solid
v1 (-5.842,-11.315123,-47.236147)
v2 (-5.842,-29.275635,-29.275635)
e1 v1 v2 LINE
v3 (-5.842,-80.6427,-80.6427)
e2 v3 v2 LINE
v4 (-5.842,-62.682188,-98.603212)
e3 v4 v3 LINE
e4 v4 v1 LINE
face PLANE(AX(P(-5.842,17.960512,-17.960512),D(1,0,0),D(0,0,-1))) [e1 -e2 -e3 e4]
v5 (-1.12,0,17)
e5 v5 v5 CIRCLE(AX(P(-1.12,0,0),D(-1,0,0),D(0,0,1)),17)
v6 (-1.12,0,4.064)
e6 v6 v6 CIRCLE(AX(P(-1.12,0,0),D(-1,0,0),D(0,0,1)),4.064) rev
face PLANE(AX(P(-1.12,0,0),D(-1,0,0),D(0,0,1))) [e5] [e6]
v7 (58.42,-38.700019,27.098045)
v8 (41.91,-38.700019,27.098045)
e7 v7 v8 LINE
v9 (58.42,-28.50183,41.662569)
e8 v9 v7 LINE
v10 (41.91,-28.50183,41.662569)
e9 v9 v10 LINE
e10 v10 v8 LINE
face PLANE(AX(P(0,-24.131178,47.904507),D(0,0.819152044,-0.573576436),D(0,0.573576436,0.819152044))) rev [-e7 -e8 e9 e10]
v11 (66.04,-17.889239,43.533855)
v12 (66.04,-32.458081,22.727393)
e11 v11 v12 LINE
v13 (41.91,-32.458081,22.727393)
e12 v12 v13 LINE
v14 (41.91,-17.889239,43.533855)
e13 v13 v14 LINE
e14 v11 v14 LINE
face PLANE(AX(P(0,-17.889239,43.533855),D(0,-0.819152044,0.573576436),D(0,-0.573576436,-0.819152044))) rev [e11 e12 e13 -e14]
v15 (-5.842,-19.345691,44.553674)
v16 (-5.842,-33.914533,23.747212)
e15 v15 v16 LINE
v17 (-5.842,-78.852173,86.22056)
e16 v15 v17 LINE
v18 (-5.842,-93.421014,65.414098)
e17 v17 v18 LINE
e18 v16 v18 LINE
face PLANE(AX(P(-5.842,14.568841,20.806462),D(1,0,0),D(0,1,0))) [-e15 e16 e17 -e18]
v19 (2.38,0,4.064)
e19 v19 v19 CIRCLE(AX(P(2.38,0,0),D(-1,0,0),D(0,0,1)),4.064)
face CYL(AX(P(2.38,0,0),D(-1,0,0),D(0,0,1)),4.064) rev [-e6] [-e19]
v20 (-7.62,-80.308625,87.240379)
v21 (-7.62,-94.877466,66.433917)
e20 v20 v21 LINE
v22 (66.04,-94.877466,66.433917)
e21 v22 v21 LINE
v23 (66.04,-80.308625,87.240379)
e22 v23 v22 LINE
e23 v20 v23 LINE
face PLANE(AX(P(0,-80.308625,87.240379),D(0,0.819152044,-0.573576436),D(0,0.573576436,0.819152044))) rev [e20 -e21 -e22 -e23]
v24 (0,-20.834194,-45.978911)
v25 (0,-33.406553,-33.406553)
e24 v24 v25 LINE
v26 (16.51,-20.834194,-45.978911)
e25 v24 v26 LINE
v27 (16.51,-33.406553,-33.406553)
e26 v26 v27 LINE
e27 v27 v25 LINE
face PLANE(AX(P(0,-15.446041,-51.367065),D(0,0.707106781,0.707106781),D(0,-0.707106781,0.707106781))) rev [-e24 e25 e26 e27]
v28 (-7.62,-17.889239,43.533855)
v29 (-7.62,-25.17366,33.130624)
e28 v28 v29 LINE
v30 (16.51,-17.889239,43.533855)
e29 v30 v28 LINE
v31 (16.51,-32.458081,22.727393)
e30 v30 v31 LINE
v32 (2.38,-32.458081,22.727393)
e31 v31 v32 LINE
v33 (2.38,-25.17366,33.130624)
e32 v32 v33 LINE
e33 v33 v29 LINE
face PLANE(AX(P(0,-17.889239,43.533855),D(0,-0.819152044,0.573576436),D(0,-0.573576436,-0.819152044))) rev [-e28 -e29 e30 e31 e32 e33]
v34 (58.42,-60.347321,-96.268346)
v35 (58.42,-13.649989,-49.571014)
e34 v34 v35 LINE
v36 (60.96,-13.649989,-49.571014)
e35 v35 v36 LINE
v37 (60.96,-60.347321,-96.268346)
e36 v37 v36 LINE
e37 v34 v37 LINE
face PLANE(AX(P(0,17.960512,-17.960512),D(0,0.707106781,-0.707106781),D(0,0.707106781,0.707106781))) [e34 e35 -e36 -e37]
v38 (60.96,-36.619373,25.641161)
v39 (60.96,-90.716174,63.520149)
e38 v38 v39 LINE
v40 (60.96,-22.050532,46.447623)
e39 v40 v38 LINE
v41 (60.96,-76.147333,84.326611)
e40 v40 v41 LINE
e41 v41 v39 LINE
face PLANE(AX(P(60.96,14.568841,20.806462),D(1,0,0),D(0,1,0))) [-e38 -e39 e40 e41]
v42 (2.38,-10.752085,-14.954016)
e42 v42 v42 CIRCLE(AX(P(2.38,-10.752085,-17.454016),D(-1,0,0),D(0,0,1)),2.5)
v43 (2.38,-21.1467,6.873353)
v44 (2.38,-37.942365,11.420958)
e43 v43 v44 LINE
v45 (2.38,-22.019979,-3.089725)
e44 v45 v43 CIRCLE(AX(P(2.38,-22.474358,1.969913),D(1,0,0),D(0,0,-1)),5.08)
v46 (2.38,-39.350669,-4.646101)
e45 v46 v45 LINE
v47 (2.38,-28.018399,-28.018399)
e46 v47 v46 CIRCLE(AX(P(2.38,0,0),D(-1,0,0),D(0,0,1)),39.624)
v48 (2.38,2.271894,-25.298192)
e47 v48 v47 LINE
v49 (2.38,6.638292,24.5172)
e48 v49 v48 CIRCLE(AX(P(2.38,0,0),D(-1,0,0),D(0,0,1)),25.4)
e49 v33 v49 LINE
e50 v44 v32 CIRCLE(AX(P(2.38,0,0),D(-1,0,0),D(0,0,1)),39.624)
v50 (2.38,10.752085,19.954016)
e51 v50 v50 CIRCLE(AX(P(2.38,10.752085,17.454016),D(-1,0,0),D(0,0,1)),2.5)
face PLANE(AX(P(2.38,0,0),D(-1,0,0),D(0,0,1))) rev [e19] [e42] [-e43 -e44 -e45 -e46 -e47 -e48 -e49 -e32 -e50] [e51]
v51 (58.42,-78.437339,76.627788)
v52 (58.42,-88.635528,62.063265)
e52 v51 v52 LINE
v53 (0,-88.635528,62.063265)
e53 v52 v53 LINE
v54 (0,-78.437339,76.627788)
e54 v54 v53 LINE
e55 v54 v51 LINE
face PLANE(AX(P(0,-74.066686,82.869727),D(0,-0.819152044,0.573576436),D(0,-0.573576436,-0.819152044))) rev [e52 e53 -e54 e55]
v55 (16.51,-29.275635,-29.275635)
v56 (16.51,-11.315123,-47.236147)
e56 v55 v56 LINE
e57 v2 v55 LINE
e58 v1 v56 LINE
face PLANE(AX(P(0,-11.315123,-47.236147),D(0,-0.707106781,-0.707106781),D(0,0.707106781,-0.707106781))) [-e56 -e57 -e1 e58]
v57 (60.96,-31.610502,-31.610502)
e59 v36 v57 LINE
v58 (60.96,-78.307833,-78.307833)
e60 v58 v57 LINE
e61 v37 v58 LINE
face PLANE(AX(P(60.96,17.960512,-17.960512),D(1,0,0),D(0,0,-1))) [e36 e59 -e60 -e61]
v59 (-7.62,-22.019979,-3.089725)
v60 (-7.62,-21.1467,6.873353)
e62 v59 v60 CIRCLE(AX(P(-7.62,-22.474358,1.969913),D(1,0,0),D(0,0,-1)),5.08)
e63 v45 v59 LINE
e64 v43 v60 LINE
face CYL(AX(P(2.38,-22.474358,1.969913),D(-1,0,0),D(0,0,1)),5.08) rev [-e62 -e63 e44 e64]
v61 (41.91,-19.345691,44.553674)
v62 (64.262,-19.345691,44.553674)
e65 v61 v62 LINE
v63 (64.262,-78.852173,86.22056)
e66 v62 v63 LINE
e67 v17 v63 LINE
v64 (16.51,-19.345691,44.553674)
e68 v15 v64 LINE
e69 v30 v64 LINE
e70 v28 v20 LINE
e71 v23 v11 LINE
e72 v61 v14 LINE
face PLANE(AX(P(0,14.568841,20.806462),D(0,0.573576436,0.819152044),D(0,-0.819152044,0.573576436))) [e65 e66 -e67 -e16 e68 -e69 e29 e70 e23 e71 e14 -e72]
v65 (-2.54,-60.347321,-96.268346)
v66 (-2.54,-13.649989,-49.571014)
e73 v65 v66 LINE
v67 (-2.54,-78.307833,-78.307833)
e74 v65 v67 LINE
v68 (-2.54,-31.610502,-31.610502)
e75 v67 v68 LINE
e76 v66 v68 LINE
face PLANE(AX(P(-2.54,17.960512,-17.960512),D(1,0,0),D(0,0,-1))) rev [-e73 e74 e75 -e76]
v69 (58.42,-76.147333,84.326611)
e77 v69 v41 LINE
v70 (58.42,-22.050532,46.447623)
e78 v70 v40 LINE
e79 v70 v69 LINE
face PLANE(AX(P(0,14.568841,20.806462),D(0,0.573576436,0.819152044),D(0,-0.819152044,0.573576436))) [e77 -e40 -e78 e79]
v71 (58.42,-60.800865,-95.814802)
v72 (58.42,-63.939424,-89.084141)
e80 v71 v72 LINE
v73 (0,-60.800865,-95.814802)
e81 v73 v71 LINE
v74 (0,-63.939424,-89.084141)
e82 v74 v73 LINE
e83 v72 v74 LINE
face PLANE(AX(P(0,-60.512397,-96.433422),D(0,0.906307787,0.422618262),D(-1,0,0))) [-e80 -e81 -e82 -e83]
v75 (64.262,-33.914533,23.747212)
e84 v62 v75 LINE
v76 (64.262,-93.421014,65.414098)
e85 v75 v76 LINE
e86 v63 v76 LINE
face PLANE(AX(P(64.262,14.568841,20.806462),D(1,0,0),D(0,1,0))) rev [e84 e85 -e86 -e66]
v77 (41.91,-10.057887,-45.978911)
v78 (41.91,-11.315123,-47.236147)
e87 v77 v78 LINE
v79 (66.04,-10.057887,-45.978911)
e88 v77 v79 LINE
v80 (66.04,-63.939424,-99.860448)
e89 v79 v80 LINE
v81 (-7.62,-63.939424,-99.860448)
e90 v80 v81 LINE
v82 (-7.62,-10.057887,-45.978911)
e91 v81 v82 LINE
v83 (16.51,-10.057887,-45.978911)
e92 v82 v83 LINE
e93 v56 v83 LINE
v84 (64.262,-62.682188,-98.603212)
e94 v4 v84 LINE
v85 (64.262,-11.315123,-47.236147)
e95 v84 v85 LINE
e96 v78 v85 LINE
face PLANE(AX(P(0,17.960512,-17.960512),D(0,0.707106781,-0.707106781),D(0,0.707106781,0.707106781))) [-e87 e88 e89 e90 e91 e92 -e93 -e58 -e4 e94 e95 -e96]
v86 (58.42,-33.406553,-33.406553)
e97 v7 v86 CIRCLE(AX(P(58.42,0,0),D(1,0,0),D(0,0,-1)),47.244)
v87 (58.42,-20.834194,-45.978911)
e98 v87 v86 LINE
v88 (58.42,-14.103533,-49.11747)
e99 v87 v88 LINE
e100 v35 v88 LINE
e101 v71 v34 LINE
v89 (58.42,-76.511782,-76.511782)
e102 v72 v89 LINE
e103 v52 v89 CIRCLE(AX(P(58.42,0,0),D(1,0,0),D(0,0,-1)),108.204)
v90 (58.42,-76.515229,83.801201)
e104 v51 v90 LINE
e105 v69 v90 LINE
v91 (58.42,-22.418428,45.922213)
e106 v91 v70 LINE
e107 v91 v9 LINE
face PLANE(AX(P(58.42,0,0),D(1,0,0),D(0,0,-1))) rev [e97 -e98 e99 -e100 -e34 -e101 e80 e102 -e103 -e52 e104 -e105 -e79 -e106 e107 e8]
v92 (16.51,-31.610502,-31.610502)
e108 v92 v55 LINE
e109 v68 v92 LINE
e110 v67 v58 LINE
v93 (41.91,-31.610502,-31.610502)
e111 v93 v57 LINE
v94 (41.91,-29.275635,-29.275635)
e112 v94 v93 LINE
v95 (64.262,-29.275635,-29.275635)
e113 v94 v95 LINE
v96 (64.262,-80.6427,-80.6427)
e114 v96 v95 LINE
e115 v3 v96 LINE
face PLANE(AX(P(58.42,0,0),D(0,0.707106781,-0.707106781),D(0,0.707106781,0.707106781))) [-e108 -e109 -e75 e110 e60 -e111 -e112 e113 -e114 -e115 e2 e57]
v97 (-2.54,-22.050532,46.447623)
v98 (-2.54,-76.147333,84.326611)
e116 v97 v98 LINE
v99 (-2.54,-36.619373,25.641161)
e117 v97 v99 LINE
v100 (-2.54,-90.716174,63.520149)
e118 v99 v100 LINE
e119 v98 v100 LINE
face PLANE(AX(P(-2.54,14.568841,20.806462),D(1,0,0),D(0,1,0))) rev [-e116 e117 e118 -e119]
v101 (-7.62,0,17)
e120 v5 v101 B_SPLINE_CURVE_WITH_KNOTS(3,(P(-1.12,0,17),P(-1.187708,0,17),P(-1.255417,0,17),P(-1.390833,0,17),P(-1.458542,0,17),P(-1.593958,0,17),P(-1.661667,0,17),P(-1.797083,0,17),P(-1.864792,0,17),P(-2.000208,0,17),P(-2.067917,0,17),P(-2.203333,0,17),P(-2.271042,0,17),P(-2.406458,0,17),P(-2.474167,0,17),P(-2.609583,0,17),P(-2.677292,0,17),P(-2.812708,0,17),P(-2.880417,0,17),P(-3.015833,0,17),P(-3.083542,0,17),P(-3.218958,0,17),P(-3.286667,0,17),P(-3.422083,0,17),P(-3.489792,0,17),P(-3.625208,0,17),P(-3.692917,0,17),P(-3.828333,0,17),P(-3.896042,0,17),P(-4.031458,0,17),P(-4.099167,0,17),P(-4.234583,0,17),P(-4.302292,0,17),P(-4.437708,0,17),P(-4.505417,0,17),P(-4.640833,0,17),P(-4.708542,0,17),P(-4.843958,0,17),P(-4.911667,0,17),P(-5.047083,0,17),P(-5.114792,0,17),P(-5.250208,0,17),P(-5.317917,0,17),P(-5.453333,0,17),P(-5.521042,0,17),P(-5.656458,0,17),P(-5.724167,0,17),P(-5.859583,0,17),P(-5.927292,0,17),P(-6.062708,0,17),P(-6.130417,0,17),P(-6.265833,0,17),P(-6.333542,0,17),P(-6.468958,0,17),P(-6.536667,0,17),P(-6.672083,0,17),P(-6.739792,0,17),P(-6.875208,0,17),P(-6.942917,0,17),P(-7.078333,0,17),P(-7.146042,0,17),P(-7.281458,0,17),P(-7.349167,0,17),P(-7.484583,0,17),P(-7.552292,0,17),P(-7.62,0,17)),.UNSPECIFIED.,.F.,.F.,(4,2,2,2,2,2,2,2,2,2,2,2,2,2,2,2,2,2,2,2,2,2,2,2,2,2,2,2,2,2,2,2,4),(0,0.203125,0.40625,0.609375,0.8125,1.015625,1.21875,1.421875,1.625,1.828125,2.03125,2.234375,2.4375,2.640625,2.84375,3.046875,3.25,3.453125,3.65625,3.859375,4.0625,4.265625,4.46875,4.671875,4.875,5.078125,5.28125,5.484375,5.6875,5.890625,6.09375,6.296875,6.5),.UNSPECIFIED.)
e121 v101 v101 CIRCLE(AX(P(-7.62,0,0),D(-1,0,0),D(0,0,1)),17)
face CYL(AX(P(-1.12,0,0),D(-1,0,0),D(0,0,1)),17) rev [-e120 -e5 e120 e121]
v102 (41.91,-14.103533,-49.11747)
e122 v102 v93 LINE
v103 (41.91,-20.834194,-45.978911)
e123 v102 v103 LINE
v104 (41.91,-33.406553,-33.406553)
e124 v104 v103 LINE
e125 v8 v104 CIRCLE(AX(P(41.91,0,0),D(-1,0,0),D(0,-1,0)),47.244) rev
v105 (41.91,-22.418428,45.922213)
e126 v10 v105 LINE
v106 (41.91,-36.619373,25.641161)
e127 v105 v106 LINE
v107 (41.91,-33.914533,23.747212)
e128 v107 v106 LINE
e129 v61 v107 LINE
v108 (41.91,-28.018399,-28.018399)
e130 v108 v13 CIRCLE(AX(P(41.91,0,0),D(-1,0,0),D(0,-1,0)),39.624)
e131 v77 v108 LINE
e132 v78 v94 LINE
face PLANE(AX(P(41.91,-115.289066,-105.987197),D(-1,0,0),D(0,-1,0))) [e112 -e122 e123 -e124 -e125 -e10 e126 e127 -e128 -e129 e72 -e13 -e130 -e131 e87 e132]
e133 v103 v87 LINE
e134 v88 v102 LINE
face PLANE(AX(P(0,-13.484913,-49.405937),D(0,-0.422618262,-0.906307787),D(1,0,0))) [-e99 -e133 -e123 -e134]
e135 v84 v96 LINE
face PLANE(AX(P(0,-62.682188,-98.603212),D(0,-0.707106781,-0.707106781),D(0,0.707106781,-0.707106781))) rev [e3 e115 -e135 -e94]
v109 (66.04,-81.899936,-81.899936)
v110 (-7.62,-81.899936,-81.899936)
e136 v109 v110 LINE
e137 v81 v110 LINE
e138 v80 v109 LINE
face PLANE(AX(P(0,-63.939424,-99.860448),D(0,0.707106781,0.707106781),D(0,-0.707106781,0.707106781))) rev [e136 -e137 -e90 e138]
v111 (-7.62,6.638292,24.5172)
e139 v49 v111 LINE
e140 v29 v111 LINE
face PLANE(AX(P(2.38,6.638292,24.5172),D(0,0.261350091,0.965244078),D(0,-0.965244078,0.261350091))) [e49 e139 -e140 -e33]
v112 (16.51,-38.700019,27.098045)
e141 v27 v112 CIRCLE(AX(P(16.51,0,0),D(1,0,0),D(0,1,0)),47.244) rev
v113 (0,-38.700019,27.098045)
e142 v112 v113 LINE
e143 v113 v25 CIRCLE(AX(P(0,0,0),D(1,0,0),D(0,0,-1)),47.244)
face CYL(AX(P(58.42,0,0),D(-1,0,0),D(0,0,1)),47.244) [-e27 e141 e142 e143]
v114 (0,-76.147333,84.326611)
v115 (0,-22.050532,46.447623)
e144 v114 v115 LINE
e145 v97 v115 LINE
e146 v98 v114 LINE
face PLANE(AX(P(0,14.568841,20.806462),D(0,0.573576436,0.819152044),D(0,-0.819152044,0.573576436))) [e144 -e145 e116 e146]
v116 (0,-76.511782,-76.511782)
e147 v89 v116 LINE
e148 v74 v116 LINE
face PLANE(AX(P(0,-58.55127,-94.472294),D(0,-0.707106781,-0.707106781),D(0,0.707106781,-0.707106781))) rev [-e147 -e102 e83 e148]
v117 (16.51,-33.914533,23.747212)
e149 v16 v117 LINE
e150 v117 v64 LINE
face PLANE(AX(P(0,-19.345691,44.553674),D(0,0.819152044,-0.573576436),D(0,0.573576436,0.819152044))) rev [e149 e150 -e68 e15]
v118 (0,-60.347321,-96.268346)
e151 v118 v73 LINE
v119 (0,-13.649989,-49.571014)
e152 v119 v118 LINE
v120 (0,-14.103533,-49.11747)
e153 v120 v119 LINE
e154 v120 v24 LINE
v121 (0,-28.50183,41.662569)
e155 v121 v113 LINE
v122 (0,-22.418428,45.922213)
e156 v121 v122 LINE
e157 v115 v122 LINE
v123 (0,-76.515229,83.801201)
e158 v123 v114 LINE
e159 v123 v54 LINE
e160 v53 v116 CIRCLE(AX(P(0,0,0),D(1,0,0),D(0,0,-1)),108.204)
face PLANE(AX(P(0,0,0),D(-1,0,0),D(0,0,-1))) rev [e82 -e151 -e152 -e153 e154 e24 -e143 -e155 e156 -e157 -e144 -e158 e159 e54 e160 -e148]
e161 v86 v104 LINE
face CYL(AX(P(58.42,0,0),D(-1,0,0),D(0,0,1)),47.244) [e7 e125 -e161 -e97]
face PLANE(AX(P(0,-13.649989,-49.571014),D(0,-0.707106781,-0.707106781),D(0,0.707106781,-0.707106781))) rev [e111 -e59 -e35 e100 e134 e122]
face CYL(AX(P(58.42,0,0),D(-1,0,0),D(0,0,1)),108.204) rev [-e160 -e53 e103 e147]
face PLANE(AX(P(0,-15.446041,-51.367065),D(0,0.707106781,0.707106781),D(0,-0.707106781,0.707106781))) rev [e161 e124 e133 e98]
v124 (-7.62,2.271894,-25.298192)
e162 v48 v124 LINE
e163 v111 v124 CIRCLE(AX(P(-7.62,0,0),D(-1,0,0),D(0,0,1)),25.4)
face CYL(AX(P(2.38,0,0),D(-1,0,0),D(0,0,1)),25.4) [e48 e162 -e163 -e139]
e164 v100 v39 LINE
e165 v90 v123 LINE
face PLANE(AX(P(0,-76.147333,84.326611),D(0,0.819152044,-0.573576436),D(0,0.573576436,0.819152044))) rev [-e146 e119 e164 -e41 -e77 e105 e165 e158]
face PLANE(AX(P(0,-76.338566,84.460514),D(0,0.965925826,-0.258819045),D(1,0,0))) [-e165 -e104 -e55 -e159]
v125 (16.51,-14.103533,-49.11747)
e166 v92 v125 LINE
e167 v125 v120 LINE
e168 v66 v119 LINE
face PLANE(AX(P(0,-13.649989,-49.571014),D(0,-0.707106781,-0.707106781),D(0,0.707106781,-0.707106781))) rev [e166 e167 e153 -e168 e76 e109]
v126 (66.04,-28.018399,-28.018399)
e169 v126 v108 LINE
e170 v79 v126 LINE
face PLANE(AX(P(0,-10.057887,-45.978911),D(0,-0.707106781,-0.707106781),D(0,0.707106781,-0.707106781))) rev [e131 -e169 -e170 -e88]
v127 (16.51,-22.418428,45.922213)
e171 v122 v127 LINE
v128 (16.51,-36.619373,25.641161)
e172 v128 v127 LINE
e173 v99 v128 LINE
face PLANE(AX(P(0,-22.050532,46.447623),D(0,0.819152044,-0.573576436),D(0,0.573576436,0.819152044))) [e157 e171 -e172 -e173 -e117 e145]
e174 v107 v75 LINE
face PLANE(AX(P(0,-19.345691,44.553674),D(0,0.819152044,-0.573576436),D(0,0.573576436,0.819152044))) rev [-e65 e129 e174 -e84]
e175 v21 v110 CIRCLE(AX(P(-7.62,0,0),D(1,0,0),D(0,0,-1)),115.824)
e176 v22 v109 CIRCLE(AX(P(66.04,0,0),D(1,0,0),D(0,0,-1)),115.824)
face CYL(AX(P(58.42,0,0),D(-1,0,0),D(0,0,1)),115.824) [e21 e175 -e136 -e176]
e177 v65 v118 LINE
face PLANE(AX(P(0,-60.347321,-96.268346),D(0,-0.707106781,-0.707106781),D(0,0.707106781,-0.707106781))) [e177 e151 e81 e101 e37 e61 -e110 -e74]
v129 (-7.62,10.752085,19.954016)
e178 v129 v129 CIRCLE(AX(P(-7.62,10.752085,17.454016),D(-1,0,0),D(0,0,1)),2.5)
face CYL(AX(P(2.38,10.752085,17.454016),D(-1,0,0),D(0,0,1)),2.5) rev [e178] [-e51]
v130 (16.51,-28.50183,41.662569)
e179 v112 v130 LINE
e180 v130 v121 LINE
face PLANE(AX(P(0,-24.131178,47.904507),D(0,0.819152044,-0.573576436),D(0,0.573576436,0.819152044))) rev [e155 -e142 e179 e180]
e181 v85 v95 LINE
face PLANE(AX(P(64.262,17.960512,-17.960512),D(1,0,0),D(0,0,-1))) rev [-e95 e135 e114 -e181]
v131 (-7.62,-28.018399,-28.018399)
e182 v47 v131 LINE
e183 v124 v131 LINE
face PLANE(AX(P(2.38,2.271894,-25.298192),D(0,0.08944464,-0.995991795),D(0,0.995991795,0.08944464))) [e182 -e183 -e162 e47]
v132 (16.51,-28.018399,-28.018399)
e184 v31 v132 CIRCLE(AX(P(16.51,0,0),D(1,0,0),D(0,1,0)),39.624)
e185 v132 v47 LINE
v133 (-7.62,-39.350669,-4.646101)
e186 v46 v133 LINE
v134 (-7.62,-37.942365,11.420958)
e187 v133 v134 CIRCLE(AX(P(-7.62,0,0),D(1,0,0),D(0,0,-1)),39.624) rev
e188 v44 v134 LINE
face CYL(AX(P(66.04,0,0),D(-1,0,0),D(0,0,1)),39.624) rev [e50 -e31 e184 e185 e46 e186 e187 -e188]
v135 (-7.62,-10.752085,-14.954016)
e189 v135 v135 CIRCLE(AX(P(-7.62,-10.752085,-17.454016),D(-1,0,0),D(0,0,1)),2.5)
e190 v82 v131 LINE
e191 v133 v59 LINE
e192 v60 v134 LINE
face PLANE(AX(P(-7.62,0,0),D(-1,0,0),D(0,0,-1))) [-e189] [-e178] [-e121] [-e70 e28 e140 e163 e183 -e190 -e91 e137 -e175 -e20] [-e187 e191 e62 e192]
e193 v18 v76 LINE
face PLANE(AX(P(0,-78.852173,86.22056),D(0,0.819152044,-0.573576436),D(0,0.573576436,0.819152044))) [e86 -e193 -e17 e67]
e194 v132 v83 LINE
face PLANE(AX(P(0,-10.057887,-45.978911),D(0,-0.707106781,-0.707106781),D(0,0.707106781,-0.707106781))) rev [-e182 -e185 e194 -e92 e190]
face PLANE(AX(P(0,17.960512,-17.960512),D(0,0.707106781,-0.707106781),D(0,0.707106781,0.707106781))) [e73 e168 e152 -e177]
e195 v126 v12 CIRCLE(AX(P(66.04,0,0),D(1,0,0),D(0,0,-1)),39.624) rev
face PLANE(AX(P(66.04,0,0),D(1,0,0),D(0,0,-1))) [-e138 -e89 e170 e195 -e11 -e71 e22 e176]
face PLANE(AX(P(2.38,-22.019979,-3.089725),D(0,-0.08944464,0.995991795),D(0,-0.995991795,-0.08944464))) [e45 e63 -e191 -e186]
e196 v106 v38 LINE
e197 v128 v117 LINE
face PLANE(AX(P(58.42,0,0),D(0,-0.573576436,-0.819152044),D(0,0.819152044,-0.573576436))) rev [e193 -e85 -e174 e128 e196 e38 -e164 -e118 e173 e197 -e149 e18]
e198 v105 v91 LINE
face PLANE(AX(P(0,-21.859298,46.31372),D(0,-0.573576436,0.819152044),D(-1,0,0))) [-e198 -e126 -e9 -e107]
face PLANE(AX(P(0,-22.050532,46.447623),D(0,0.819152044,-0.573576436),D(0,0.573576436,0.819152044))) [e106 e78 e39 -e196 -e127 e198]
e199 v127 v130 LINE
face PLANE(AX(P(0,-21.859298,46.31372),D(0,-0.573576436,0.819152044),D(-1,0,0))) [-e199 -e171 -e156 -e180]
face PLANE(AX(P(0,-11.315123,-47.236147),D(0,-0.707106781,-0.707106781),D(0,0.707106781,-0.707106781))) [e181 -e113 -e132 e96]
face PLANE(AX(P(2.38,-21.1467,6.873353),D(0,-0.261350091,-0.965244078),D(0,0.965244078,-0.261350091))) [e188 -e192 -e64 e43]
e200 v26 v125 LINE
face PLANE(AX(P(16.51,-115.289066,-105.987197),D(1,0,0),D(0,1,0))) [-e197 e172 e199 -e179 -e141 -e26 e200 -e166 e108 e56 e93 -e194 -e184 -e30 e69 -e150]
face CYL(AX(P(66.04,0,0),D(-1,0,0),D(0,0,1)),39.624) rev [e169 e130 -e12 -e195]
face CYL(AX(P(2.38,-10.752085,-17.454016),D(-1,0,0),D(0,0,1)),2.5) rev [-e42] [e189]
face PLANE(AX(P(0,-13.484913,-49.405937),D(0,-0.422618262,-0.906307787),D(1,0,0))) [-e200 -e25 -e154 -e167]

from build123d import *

# Parameters (mm, degrees)
BOSS_EXTRUDE2_DEPTH   = 58.42
BOSS_EXTRUDE2_2_DEPTH = 58.42
BOSS_EXTRUDE3_DEPTH   = 7.62
SKETCH6_W             = 73.66
SKETCH6_H             = 76.2
SKETCH6_W_2           = 70.104
SKETCH6_H_2           = 72.644
SKETCH6_W_3           = 63.5
SKETCH6_H_3           = 66.04
SKETCH6_W_4           = 58.42
SKETCH6_H_4           = 60.96
BOSS_EXTRUDE4_DEPTH   = 25.4
SKETCH7_W             = 73.66
SKETCH7_H             = 76.2
SKETCH7_W_2           = 70.104
SKETCH7_H_2           = 72.644
SKETCH7_W_3           = 63.5
SKETCH7_H_3           = 66.04
SKETCH7_W_4           = 58.42
SKETCH7_H_4           = 60.96
BOSS_EXTRUDE5_DEPTH   = 25.4
CHAMFER1_SIZE         = 2.773453185
CHAMFER1_SIZE_2       = 7.62
CUT_EXTRUDE3_REACH    = 158.41
SKETCH10_W            = 25.4
SKETCH10_H            = 177.72143494
SKETCH11_R            = 4.064
SKETCH11_R_2          = 2.5
BOSS_EXTRUDE6_DEPTH   = 10
SKETCH12_R            = 17
CUT_EXTRUDE4_DEPTH    = 6.5


with BuildPart() as part:
    # Sketch3 → Boss-Extrude2 (new body)
    with BuildSketch(Plane(origin=(0, 0, 0), x_dir=(0, 0, -1), z_dir=(1, 0, 0))):
        with BuildLine():
            Line((-62.063264719, -88.6355278), (-66.433917164, -94.877466378))
            ThreePointArc((-66.433917164, -94.877466378), (10.094726748, -115.383254712), (81.899935824, -81.899935824))
            Line((81.899935824, -81.899935824), (76.511782152, -76.511782152))
            ThreePointArc((76.511782152, -76.511782152), (9.430599988, -107.792251112), (-62.063264719, -88.6355278))
        make_face()
    extrude(amount=BOSS_EXTRUDE2_DEPTH)



with BuildPart() as body_2:
    # Sketch3 → Boss-Extrude2 2 (new body)
    with BuildSketch(Plane(origin=(0, 0, 0), x_dir=(0, 0, -1), z_dir=(1, 0, 0))):
        with BuildLine():
            ThreePointArc((28.018399098, -28.018399098), (3.453459151, -39.473218717), (-22.727392714, -32.458080603))
            Line((-22.727392714, -32.458080603), (-27.098045159, -38.70001918))
            ThreePointArc((-27.098045159, -38.70001918), (4.11758591, -47.064222317), (33.40655277, -33.40655277))
            Line((33.40655277, -33.40655277), (28.018399098, -28.018399098))
        make_face()
    extrude(amount=BOSS_EXTRUDE2_2_DEPTH)


with BuildPart() as part_1:
    add(part.part)

    add(body_2.part)  # Boss-Extrude3 merges body 2
    # Sketch4 → Boss-Extrude3 (add)
    with BuildSketch(Plane(origin=(58.42, 0, 0), x_dir=(0, 0, -1), z_dir=(1, 0, 0))):
        with BuildLine():
            Line((-22.727392714, -32.458080603), (-66.433917164, -94.877466378))
            ThreePointArc((-66.433917164, -94.877466378), (10.094726748, -115.383254712), (81.899935824, -81.899935824))
            Line((81.899935824, -81.899935824), (28.018399098, -28.018399098))
            ThreePointArc((28.018399098, -28.018399098), (3.453459151, -39.473218717), (-22.727392714, -32.458080603))
        make_face()
    boss_extrude3 = extrude(amount=BOSS_EXTRUDE3_DEPTH)

    # Mirror1: Boss-Extrude3 across plane
    add(boss_extrude3.mirror(Plane.ZY.offset(-29.21)))

    # Sketch6 → Boss-Extrude4 (add)
    # profile 1 of 2: a face of its own
    with BuildSketch(Plane(origin=(0, 0, 0), x_dir=(1, 0, 0), z_dir=(0, 0.5735764363510462, 0.8191520442889917))):
        with Locations((29.21, -77.724)):
            Rectangle(SKETCH6_W, SKETCH6_H)
        with Locations((29.21, -77.724)):
            Rectangle(SKETCH6_W_2, SKETCH6_H_2, mode=Mode.SUBTRACT)
    # profile 2 of 2: a face of its own
    with BuildSketch(Plane(origin=(0, 0, 0), x_dir=(1, 0, 0), z_dir=(0, 0.5735764363510462, 0.8191520442889917))):
        with Locations((29.21, -77.724)):
            Rectangle(SKETCH6_W_3, SKETCH6_H_3)
        with Locations((29.21, -77.724)):
            Rectangle(SKETCH6_W_4, SKETCH6_H_4, mode=Mode.SUBTRACT)
    extrude(amount=BOSS_EXTRUDE4_DEPTH)

    # Sketch7 → Boss-Extrude5 (add)
    # profile 1 of 2: a face of its own
    with BuildSketch(Plane(origin=(0, 0, 0), x_dir=(1, 0, 0), z_dir=(0, 0.7071067811865503, -0.7071067811865447))):
        with Locations((29.21, 77.724)):
            Rectangle(SKETCH7_W, SKETCH7_H)
        with Locations((29.21, 77.724)):
            Rectangle(SKETCH7_W_2, SKETCH7_H_2, mode=Mode.SUBTRACT)
    # profile 2 of 2: a face of its own
    with BuildSketch(Plane(origin=(0, 0, 0), x_dir=(1, 0, 0), z_dir=(0, 0.7071067811865503, -0.7071067811865447))):
        with Locations((29.21, 77.724)):
            Rectangle(SKETCH7_W_3, SKETCH7_H_3)
        with Locations((29.21, 77.724)):
            Rectangle(SKETCH7_W_4, SKETCH7_H_4, mode=Mode.SUBTRACT)
    extrude(amount=BOSS_EXTRUDE5_DEPTH)

    # Chamfer1
    # the kernel refuses this chamfer: 7.62, 2.773453185 mm, written as the material it takes off along each edge
    with BuildSketch(Plane(origin=(58.42, -15.446040528, -51.367065013), x_dir=(0, 0.7736626875489875, 0.6335977003544738), z_dir=(-1, 0, 0)), Plane(origin=(0, -24.131177697, 47.904507084), x_dir=(0, 0.8719320989550161, -0.489626811778011), z_dir=(1, 0, 0))) as chamfer1_piece_1:
        Polygon((CHAMFER1_SIZE * 0.995083363221, -CHAMFER1_SIZE * 0.0990409022559), (-CHAMFER1_SIZE_2 * 0.0990409022521, -CHAMFER1_SIZE_2 * 0.995083363182), (0, 0), align=None)
    extrude(amount=58.42, mode=Mode.SUBTRACT)
    with BuildSketch(Plane(origin=(0, -58.551269909, -94.472294394), x_dir=(0, -0.6977227871251116, 0.7163678610367485), z_dir=(1, 0, 0)), Plane(origin=(58.42, -74.066686317, 82.869726644), x_dir=(0, -0.562726836605906, -0.8266429140587307), z_dir=(-1, 0, 0))) as chamfer1_piece_2:
        Polygon((CHAMFER1_SIZE_2 * 0.999913086528, CHAMFER1_SIZE_2 * 0.0131840581986), (-CHAMFER1_SIZE * 0.0131840581992, CHAMFER1_SIZE * 0.999913086567), (0, 0), align=None)
    extrude(amount=58.42, mode=Mode.SUBTRACT)

    # Sketch10 → Cut-Extrude3 (cut, up to next)
    with BuildSketch(Plane(origin=(0, -13.973562988, -1.22252835), x_dir=(-1, 0, 0), z_dir=(0, -0.9961946980917453, -0.08715574274766034)), mode=Mode.PRIVATE) as cut_extrude3_sk1:
        with Locations((-29.21, 6.675062398)):
            Rectangle(SKETCH10_W, SKETCH10_H)
    cut_extrude3_tool1 = extrude(cut_extrude3_sk1.sketch, amount=CUT_EXTRUDE3_REACH, mode=Mode.PRIVATE) & part_1.part
    add(cut_extrude3_tool1.solids().sort_by_distance((29.21, -13.391793, -7.87219))[0], mode=Mode.SUBTRACT)

    # Sketch11 → Boss-Extrude6 (add)
    with BuildSketch(Plane.ZY.offset(7.62)):
        with BuildLine():
            Line((-25.298191602, 2.271893855), (-28.018399098, -28.018399098))
            ThreePointArc((-28.018399098, -28.018399098), (-17.287205304, -35.654086845), (-4.646100514, -39.350668686))
            Line((-4.646100514, -39.350668686), (-3.089724987, -22.01997949))
            ThreePointArc((-3.089724987, -22.01997949), (1.526343902, -17.41376085), (6.873353249, -21.146699798))
            Line((6.873353249, -21.146699798), (11.420958182, -37.942365374))
            ThreePointArc((11.420958182, -37.942365374), (17.292970019, -35.651291196), (22.727392714, -32.458080603))
            Line((22.727392714, -32.458080603), (33.130623676, -25.173659861))
            Line((33.130623676, -25.173659861), (24.517199578, 6.638292315))
            ThreePointArc((24.517199578, 6.638292315), (-2.217847157, 25.302987057), (-25.298191602, 2.271893855))
        make_face()
        Circle(SKETCH11_R, mode=Mode.SUBTRACT)
        with Locations((-17.454015953, -10.75208478)):
            Circle(SKETCH11_R_2, mode=Mode.SUBTRACT)
        with Locations((17.454015953, 10.75208478)):
            Circle(SKETCH11_R_2, mode=Mode.SUBTRACT)
    extrude(amount=-BOSS_EXTRUDE6_DEPTH)

    # Sketch12 → Cut-Extrude4 (cut)
    with BuildSketch(Plane.ZY.offset(7.62)):
        Circle(SKETCH12_R)
    extrude(amount=-CUT_EXTRUDE4_DEPTH, mode=Mode.SUBTRACT)


solid = part_1.part
